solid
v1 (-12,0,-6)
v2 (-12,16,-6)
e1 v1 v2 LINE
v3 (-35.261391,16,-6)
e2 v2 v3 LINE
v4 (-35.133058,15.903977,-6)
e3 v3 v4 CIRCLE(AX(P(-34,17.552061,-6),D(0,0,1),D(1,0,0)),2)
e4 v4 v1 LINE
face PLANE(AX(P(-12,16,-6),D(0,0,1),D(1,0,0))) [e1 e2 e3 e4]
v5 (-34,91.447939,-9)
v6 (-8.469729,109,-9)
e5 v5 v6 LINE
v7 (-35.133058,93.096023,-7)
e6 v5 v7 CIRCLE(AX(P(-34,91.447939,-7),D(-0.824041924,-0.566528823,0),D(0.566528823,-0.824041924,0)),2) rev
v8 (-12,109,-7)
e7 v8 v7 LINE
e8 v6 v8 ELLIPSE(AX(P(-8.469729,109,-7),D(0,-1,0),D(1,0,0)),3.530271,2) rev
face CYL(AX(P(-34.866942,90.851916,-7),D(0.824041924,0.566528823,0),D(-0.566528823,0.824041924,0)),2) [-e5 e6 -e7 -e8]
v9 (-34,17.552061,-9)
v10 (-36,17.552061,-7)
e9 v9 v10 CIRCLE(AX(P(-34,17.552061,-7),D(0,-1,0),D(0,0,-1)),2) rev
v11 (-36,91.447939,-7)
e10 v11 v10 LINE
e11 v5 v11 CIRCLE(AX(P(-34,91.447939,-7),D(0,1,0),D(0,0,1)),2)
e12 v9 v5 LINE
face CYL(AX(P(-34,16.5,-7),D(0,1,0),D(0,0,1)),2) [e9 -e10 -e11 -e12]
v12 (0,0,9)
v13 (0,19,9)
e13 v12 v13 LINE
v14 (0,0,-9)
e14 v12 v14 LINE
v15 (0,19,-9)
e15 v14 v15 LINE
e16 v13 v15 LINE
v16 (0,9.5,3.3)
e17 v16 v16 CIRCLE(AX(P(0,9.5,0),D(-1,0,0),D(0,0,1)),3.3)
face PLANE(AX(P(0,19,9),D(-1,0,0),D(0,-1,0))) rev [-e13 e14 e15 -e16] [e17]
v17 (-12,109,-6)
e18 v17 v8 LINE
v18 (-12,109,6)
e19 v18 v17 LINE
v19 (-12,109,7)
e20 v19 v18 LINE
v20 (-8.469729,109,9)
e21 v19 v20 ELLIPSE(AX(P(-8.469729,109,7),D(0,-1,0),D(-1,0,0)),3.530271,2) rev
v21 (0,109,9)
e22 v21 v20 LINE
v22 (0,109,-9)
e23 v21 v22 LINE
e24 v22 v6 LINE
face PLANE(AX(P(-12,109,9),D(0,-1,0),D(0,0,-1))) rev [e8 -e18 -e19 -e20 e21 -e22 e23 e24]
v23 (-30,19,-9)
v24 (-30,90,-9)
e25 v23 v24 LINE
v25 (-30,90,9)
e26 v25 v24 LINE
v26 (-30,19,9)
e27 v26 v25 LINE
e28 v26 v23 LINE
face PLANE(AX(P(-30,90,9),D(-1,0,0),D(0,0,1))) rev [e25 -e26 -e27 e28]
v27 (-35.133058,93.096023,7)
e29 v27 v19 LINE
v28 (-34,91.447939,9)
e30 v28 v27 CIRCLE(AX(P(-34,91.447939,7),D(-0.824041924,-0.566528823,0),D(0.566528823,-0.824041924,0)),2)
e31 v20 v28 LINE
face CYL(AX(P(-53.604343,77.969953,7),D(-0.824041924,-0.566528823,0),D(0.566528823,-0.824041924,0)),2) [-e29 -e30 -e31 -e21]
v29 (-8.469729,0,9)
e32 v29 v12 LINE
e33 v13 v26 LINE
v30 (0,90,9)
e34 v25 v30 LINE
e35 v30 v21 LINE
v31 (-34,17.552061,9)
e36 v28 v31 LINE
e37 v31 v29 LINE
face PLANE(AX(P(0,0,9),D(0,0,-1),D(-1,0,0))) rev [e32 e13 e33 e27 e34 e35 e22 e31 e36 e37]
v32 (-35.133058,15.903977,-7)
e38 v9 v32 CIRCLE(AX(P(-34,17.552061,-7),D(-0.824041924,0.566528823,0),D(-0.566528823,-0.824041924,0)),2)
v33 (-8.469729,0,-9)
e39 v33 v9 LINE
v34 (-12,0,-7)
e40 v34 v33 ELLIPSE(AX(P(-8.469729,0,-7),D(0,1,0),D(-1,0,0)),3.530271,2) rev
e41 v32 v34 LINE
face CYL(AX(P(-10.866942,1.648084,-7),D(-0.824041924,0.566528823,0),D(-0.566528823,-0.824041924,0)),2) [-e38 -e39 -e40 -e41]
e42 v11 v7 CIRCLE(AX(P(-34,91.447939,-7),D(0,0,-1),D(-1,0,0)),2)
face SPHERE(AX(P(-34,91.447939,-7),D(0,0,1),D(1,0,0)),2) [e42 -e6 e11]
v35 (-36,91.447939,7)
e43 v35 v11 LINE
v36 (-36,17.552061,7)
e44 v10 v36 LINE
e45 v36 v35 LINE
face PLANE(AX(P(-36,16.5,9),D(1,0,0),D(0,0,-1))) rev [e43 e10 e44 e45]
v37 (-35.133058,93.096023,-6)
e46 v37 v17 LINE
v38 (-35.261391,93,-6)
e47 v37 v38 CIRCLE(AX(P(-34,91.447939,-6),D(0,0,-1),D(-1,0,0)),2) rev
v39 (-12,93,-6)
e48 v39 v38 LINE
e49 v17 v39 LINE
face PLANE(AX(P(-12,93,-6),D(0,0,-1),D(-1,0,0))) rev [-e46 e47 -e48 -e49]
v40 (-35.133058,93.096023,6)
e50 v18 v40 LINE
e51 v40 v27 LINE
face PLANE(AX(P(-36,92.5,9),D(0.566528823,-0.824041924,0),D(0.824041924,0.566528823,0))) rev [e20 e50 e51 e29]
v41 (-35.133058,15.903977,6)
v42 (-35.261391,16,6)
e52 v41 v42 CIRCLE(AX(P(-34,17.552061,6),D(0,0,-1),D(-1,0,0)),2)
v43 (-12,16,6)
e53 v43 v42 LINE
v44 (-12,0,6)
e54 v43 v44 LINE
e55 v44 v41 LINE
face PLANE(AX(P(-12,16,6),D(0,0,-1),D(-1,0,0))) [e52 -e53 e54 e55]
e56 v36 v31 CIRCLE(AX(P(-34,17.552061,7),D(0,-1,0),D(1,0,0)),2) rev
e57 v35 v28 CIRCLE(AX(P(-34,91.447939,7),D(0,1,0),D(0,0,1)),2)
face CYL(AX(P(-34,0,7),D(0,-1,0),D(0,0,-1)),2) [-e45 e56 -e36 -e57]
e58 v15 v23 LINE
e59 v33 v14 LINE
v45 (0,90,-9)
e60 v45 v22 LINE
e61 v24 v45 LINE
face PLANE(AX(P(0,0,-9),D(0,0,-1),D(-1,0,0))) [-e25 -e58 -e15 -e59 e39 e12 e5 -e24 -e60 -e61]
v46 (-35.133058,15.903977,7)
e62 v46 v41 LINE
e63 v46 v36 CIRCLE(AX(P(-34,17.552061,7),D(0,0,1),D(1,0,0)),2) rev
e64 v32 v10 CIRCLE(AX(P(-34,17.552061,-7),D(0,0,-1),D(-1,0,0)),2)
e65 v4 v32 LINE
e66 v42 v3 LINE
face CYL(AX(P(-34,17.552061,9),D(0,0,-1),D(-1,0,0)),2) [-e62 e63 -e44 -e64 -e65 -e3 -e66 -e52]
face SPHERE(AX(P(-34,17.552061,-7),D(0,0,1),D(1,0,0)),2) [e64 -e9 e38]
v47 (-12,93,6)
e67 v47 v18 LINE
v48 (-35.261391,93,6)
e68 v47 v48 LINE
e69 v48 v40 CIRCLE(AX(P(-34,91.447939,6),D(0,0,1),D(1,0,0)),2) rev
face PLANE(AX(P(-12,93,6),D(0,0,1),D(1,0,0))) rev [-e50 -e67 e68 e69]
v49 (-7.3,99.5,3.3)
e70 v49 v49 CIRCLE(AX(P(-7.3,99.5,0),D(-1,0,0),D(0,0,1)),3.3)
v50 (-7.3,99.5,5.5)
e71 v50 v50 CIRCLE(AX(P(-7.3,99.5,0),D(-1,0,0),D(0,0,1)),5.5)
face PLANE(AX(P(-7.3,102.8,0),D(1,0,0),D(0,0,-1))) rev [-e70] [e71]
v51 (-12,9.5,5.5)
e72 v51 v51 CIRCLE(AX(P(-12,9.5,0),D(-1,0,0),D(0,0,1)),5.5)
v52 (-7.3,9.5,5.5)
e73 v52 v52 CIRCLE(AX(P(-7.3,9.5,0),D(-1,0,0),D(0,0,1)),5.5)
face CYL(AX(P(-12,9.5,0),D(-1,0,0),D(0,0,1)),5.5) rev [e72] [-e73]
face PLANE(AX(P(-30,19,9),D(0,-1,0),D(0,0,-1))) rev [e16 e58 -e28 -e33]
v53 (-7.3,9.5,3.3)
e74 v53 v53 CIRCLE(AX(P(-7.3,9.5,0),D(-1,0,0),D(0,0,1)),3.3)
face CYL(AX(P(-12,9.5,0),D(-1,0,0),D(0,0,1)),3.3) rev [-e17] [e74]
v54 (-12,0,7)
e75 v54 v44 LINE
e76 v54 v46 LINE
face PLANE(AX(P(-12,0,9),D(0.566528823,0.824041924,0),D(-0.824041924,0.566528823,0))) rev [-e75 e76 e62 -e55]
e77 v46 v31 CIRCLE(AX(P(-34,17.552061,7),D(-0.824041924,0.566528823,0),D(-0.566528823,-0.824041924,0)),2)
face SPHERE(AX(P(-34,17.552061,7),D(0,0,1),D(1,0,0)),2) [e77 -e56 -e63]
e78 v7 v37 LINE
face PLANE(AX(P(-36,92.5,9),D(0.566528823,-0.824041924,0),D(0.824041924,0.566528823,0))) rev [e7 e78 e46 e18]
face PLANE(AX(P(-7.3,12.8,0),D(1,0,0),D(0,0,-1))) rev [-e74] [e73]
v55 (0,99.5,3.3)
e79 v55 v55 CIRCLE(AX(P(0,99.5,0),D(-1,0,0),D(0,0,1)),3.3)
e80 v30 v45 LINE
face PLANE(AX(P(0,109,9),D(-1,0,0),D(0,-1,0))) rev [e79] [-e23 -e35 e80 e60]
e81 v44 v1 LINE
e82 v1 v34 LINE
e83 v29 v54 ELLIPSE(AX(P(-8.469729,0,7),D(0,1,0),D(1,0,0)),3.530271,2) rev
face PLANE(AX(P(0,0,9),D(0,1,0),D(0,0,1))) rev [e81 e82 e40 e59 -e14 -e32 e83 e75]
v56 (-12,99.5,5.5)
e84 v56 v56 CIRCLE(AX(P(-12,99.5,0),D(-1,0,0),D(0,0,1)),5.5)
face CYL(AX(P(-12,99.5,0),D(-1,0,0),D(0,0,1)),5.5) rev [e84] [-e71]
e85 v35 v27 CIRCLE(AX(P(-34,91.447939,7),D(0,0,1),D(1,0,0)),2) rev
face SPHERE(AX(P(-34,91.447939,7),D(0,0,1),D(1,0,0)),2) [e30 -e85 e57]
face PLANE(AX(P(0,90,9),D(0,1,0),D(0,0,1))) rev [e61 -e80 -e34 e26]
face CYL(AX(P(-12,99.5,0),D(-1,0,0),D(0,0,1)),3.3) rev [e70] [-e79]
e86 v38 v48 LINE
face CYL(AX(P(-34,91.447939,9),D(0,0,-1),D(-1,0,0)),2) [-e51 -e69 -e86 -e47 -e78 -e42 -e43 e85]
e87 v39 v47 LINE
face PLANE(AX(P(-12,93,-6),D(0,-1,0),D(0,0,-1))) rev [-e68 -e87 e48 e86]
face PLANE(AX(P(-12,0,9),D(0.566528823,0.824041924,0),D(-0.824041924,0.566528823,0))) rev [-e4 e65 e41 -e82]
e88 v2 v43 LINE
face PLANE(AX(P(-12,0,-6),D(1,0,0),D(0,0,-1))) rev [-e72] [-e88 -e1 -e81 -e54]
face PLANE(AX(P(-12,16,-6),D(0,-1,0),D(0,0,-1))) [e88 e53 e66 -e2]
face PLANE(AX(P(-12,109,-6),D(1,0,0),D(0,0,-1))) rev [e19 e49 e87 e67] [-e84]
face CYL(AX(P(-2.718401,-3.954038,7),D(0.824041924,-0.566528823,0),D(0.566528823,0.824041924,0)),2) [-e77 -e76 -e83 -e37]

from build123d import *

# Parameters (mm, degrees)
EXTRUDE_1_DEPTH               = 9
SKETCH_2_W                    = 12
SKETCH_2_H                    = 16
CUT_EXTRUDE_1_DEPTH           = 24
HOLE_WIZARD_4_8_1_D           = 6.6
HOLE_WIZARD_4_8_1_CBORE_D     = 11
HOLE_WIZARD_4_8_1_CBORE_DEPTH = 4.7
FILLET_1_R                    = 2


with BuildPart() as part:
    # 草图1 → 凸台-拉伸1 (new, symmetric)
    with BuildSketch(Plane.XY):
        Polygon((0, 0), (-12, 0), (-36, 16.5), (-36, 92.5), (-12, 109), (0, 109), (0, 90), (-30, 90), (-30, 19), (0, 19), align=None)
    extrude(amount=EXTRUDE_1_DEPTH, both=True)

    # 草图2 → 切除-拉伸1 (cut)
    with BuildSketch(Plane.ZY.offset(36)):
        with Locations((0, 101)):
            Rectangle(SKETCH_2_W, SKETCH_2_H)
    cut_extrude_1 = extrude(amount=-CUT_EXTRUDE_1_DEPTH, mode=Mode.SUBTRACT)

    # 打孔尺寸根据内六角花形圆柱头螺钉-4.8级的类型1 (through all)
    with Locations(Plane.ZY.offset(12)):
        with Locations((0, 99.5)):
            hole_wizard_4_8_1 = CounterBoreHole(HOLE_WIZARD_4_8_1_D / 2, HOLE_WIZARD_4_8_1_CBORE_D / 2, HOLE_WIZARD_4_8_1_CBORE_DEPTH)

    # 镜向1: 切除-拉伸1, 打孔尺寸根据内六角花形圆柱头螺钉-4.8级的类型1 across plane
    add(cut_extrude_1.mirror(Plane.ZX.offset(54.5)), mode=Mode.SUBTRACT)
    add(hole_wizard_4_8_1.mirror(Plane.ZX.offset(54.5)), mode=Mode.SUBTRACT)

    # 圆角1
    # the kernel refuses this fillet: 2 mm, written as the material it takes off along each edge
    with BuildSketch(Plane(origin=(-34, 91.44793902, -7), x_dir=(-1, 0, 0), z_dir=(0, 0, -1))) as fillet_1_piece_1_section:
        Polygon((0, 0), (FILLET_1_R, 0), (FILLET_1_R, FILLET_1_R * 0.526030489934), (FILLET_1_R * 0.566528822887, FILLET_1_R * 0.824041924199), align=None)
    fillet_1_piece_1 = extrude(amount=FILLET_1_R, mode=Mode.PRIVATE)
    fillet_1_piece_1 = fillet_1_piece_1 - Plane(origin=(-34, 91.44793902, -7), x_dir=(0.8850222660721778, -0.46554869622464556, 0), z_dir=(0, 0, -1)) * Sphere(FILLET_1_R, mode=Mode.PRIVATE)
    add(fillet_1_piece_1, mode=Mode.SUBTRACT)
    with BuildSketch(Plane(origin=(-34, 91.44793902, 7), x_dir=(-1, 0, 0), z_dir=(0, 0, 1))) as fillet_1_piece_2_section:
        Polygon((0, 0), (FILLET_1_R, 0), (FILLET_1_R, -FILLET_1_R * 0.526030489934), (FILLET_1_R * 0.566528822887, -FILLET_1_R * 0.824041924199), align=None)
    fillet_1_piece_2 = extrude(amount=FILLET_1_R, mode=Mode.PRIVATE)
    fillet_1_piece_2 = fillet_1_piece_2 - Plane(origin=(-34, 91.44793902, 7), x_dir=(0.8850222660721778, -0.46554869622464556, 0), z_dir=(0, 0, 1)) * Sphere(FILLET_1_R, mode=Mode.PRIVATE)
    add(fillet_1_piece_2, mode=Mode.SUBTRACT)
    with BuildSketch(Plane(origin=(-34, 17.55206098, 7), x_dir=(-1, 0, 0), z_dir=(0, 0, 1))) as fillet_1_piece_3_section:
        Polygon((0, 0), (FILLET_1_R, 0), (FILLET_1_R, FILLET_1_R * 0.526030489934), (FILLET_1_R * 0.566528822887, FILLET_1_R * 0.824041924199), align=None)
    fillet_1_piece_3 = extrude(amount=FILLET_1_R, mode=Mode.PRIVATE)
    fillet_1_piece_3 = fillet_1_piece_3 - Plane(origin=(-34, 17.55206098, 7), x_dir=(0.8850222660721778, 0.46554869622464556, 0), z_dir=(0, 0, 1)) * Sphere(FILLET_1_R, mode=Mode.PRIVATE)
    add(fillet_1_piece_3, mode=Mode.SUBTRACT)
    with BuildSketch(Plane(origin=(-34, 17.55206098, -7), x_dir=(-0.5665288228870655, -0.8240419241993675, 0), z_dir=(0, 0, -1))) as fillet_1_piece_4_section:
        Polygon((0, 0), (FILLET_1_R, 0), (FILLET_1_R, FILLET_1_R * 0.526030489934), (FILLET_1_R * 0.566528822887, FILLET_1_R * 0.824041924199), align=None)
    fillet_1_piece_4 = extrude(amount=FILLET_1_R, mode=Mode.PRIVATE)
    fillet_1_piece_4 = fillet_1_piece_4 - Plane(origin=(-34, 17.55206098, -7), x_dir=(0.8850222660721778, 0.46554869622464556, 0), z_dir=(0, 0, -1)) * Sphere(FILLET_1_R, mode=Mode.PRIVATE)
    add(fillet_1_piece_4, mode=Mode.SUBTRACT)
    with BuildSketch(Plane(origin=(-35.133057646, 93.096022869, -9), x_dir=(0.5665288228870655, -0.8240419241993674, 0), z_dir=(0.8240419241993675, 0.5665288228870655, 0)), Plane(origin=(-7.879790379, -2.832644114, 9), x_dir=(0, 0, -1), z_dir=(-0.8240419241993675, 0.5665288228870655, 0)), Plane(origin=(-7.879790379, -2.832644114, -9), x_dir=(0.5665288228870655, 0.8240419241993675, 0), z_dir=(-0.8240419241993675, 0.5665288228870655, 0))) as fillet_1_piece_5:
        with BuildLine():
            CenterArc((FILLET_1_R, -FILLET_1_R), FILLET_1_R, 90, 90)
            Line((0, -FILLET_1_R), (0, 0))
            Line((0, 0), (FILLET_1_R, 0))
        make_face()
    extrude(amount=33.072670779, mode=Mode.SUBTRACT)
    with BuildSketch(Plane(origin=(-35.133057646, 93.096022869, 9), x_dir=(0.5665288228870655, -0.8240419241993674, 0), z_dir=(0.8240419241993675, 0.5665288228870655, 0))) as fillet_1_piece_6:
        with BuildLine():
            CenterArc((FILLET_1_R, FILLET_1_R), FILLET_1_R, 180, 90)
            Line((0, FILLET_1_R), (0, 0))
            Line((0, 0), (FILLET_1_R, 0))
        make_face()
    extrude(amount=33.072670779, mode=Mode.SUBTRACT)
    with BuildSketch(Plane(origin=(-36, 92.5, 7), x_dir=(0, -1, 0), z_dir=(0, 0, -1)), Plane(origin=(-36, 16.5, 7), x_dir=(0.8240419241993692, -0.566528822887063, 0), z_dir=(0, 0, -1))) as fillet_1_piece_7:
        with BuildLine():
            CenterArc((FILLET_1_R * 0.526030489934, -FILLET_1_R), FILLET_1_R, 90, 55.491477012)
            Line((-FILLET_1_R * 0.298011434265, -FILLET_1_R * 0.433471177113), (0, 0))
            Line((0, 0), (FILLET_1_R * 0.526030489934, 0))
        make_face()
    extrude(amount=14, mode=Mode.SUBTRACT)
    with BuildSketch(Plane(origin=(-36, 17.55206098, -9), x_dir=(1, 0, 0), z_dir=(0, 1, 0))) as fillet_1_piece_8:
        with BuildLine():
            CenterArc((FILLET_1_R, -FILLET_1_R), FILLET_1_R, 90, 90)
            Line((0, -FILLET_1_R), (0, 0))
            Line((0, 0), (FILLET_1_R, 0))
        make_face()
    extrude(amount=73.89587804, mode=Mode.SUBTRACT)
    with BuildSketch(Plane(origin=(-36, 17.55206098, 9), x_dir=(1, 0, 0), z_dir=(0, 1, 0))) as fillet_1_piece_9:
        with BuildLine():
            CenterArc((FILLET_1_R, FILLET_1_R), FILLET_1_R, 180, 90)
            Line((0, FILLET_1_R), (0, 0))
            Line((0, 0), (FILLET_1_R, 0))
        make_face()
    extrude(amount=73.89587804, mode=Mode.SUBTRACT)


solid = part.part
